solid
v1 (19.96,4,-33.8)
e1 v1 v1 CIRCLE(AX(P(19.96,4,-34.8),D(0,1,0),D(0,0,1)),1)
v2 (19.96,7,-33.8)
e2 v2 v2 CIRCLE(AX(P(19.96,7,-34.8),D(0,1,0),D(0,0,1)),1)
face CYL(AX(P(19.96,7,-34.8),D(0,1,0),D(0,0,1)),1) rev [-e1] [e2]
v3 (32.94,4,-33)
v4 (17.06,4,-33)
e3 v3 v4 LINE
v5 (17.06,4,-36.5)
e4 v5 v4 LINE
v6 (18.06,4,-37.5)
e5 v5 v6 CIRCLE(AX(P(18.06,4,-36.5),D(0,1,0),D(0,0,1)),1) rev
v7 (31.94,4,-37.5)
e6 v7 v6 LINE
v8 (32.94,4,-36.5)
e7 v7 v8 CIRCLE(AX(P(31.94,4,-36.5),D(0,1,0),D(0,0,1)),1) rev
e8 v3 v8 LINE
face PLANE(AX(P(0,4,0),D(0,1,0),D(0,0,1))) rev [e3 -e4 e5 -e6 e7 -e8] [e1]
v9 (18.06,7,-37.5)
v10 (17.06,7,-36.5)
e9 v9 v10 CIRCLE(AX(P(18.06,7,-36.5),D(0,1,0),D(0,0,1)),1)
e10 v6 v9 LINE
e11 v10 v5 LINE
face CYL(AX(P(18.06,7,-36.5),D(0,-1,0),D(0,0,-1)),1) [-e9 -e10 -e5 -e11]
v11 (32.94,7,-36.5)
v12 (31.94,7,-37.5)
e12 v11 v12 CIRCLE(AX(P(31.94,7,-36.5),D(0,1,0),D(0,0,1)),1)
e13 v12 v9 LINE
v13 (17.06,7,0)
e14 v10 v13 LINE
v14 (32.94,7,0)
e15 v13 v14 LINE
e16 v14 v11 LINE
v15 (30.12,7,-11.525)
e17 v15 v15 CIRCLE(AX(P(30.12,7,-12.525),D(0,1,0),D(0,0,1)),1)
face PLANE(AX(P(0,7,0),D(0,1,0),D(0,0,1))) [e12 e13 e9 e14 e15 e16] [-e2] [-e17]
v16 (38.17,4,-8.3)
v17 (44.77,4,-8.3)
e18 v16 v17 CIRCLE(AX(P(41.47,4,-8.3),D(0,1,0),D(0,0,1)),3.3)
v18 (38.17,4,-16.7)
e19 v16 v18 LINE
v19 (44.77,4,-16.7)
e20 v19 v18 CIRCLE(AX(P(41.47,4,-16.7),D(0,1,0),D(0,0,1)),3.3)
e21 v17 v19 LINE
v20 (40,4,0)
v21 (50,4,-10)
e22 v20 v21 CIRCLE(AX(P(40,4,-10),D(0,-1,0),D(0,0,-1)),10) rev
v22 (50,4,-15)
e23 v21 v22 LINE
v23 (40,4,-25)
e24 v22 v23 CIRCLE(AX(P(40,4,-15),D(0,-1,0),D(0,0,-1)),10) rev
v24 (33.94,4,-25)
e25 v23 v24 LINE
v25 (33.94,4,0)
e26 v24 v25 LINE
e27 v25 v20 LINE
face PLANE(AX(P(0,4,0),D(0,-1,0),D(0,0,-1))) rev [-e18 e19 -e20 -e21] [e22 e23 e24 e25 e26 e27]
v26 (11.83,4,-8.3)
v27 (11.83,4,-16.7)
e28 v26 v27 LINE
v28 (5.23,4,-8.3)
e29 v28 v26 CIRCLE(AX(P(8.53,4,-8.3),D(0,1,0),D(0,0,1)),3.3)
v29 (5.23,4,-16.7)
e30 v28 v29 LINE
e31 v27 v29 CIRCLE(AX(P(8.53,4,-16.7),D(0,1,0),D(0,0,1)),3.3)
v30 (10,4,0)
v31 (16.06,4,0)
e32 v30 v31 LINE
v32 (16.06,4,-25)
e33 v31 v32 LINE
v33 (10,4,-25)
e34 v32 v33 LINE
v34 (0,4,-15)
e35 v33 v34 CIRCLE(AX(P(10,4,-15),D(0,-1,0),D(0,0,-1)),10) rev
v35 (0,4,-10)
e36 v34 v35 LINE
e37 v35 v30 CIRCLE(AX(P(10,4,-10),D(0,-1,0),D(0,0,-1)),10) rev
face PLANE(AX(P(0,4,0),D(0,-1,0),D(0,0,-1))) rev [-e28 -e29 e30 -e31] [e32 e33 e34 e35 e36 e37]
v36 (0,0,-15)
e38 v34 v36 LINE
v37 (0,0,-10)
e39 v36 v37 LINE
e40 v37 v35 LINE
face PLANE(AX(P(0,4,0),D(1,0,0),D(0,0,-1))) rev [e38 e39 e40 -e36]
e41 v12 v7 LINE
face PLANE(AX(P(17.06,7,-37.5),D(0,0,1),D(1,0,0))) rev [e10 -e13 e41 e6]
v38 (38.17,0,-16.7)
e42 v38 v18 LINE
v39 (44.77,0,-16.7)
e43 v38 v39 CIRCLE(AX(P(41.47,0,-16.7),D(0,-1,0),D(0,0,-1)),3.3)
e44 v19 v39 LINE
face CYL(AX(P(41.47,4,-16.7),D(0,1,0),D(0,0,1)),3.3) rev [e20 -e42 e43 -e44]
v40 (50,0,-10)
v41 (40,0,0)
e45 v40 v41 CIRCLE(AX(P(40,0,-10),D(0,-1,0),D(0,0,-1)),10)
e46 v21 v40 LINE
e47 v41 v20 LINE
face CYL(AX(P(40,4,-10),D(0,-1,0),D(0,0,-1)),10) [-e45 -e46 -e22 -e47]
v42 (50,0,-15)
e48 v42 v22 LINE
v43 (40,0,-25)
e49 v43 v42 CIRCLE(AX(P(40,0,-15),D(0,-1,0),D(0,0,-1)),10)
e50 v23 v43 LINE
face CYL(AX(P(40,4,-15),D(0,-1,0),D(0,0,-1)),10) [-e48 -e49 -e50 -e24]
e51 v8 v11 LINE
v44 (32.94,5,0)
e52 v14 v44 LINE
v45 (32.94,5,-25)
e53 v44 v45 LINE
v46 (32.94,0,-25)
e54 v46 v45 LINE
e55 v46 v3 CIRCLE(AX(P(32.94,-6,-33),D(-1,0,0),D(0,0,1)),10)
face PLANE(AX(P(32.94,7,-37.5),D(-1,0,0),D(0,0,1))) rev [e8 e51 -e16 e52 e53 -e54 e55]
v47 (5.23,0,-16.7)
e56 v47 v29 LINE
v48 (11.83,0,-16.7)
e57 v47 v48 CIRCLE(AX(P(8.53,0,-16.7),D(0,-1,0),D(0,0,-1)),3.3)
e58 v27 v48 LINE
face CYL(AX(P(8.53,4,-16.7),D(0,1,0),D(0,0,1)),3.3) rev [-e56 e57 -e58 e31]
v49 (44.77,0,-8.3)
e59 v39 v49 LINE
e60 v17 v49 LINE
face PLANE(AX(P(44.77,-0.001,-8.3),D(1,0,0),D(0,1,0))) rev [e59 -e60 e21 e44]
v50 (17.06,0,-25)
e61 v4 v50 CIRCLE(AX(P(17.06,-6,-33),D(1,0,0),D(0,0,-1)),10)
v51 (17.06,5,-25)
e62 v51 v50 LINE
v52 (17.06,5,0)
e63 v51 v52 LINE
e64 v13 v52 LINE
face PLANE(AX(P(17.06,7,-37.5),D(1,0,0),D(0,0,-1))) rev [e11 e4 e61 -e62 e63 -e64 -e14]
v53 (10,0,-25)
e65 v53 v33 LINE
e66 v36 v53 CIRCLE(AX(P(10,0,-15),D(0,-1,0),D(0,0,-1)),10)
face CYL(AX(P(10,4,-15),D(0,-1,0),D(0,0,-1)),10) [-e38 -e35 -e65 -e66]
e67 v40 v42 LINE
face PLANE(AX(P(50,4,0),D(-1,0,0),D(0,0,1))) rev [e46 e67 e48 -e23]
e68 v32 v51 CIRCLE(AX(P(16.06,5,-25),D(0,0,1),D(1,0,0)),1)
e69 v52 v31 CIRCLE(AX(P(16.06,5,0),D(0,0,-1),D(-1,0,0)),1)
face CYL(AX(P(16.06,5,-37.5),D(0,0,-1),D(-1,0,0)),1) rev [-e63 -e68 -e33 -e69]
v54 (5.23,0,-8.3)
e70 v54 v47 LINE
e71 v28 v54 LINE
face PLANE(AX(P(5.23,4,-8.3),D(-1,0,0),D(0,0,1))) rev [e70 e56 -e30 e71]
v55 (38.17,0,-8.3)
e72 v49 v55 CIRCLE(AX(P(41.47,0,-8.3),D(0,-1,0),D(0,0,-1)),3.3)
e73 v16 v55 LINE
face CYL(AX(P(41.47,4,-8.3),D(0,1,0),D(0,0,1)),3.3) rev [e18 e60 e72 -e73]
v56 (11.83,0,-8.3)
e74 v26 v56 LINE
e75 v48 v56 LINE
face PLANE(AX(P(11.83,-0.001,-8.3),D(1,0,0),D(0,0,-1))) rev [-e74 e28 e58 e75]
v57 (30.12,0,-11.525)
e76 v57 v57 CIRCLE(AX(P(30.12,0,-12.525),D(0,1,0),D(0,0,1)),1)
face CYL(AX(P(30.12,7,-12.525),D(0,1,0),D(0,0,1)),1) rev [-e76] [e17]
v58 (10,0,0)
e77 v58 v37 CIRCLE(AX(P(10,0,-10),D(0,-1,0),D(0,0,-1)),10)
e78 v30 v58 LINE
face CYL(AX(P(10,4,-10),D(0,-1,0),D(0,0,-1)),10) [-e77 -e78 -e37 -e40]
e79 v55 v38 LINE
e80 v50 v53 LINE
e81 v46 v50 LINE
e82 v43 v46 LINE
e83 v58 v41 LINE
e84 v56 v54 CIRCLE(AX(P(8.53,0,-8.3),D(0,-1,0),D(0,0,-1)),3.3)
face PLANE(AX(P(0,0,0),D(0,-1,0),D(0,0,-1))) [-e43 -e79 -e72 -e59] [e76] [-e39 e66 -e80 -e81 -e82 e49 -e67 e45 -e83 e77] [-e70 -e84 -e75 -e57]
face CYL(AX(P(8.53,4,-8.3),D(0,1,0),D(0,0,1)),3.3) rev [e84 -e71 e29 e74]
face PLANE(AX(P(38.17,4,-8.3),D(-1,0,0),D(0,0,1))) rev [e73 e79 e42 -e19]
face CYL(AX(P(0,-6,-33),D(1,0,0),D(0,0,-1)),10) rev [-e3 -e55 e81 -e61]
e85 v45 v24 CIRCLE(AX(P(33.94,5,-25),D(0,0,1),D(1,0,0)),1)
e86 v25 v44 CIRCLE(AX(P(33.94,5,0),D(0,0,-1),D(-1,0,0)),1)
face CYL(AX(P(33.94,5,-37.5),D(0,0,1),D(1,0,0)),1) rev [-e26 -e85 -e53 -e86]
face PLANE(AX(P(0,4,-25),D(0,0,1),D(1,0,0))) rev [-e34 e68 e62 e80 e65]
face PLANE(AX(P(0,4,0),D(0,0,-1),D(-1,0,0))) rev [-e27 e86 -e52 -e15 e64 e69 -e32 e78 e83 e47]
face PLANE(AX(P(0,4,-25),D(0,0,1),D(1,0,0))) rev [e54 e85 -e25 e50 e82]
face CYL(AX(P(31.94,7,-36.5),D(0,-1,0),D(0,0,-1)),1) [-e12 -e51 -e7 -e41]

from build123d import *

# Parameters (mm, degrees)
SKETCH1_W                = 50
SKETCH1_H                = 25
BOSS_EXTRUDE1_DEPTH      = 4
SKETCH2_W                = 15.88
SKETCH2_H                = 37.5
BOSS_EXTRUDE2_DEPTH      = 3
M6_CLEARANCE_SLOT1_DEPTH = 4
M3_CLEARANCE_HOLE1_D     = 2
FILLET3_R                = 10
FILLET4_R                = 10
FILLET5_R                = 1


# Read off the part's stored shape, not the designer's step: M6 Clearance Slot1
with BuildPart() as part:
    # Sketch1 → Boss-Extrude1 (new body)
    with BuildSketch(Plane(origin=(0, 0, 0), x_dir=(1, 0, 0), z_dir=(0, 1, 0))):
        with Locations((25, 12.5)):
            Rectangle(SKETCH1_W, SKETCH1_H)
    extrude(amount=BOSS_EXTRUDE1_DEPTH)

    # Sketch2 → Boss-Extrude2 (add)
    with BuildSketch(Plane(origin=(0, 4, 0), x_dir=(1, 0, 0), z_dir=(0, 1, 0))):
        with Locations((25, 18.75)):
            Rectangle(SKETCH2_W, SKETCH2_H)
    extrude(amount=BOSS_EXTRUDE2_DEPTH)

    # M6 Clearance Slot1 outline → M6 Clearance Slot1 (cut)
    with BuildSketch(Plane(origin=(0, 0, 0), x_dir=(1, 0, 0), z_dir=(0, 1, 0))):
        with BuildLine():
            Line((44.77, 8.3), (44.77, 16.7))
            ThreePointArc((44.77, 16.7), (41.47, 20), (38.17, 16.7))
            Line((38.17, 16.7), (38.17, 8.3))
            ThreePointArc((38.17, 8.3), (41.47, 5), (44.77, 8.3))
        make_face()
        with BuildLine():
            Line((11.83, 8.3), (11.83, 16.7))
            ThreePointArc((11.83, 16.7), (8.53, 20), (5.23, 16.7))
            Line((5.23, 16.7), (5.23, 8.3))
            ThreePointArc((5.23, 8.3), (8.53, 5), (11.83, 8.3))
        make_face()
    extrude(amount=M6_CLEARANCE_SLOT1_DEPTH, mode=Mode.SUBTRACT)

    # M3 Clearance Hole1 (through all)
    with Locations(Plane(origin=(0, 7, 0), x_dir=(1, 0, 0), z_dir=(0, 1, 0))):
        with Locations((19.96, 34.8), (30.12, 12.525)):
            Hole(M3_CLEARANCE_HOLE1_D / 2)

    # Fillet3
    fillet3_edges = [part.edges().sort_by_distance(p)[0] for p in [
        (0, 2, -25),
        (50, 2, -25),
        (50, 2, 0),
        (0, 2, 0),
    ]]
    fillet(fillet3_edges, radius=FILLET3_R)

    # Fillet4
    # the kernel refuses this fillet: 10 mm, written as the material it adds along each edge
    with BuildSketch(Plane(origin=(32.94, 4, -25), x_dir=(0, -1, 0), z_dir=(-1, 0, 0))) as fillet4_piece_1:
        with BuildLine():
            CenterArc((10, -8), FILLET4_R, 126.869897646, 53.130102354)
            Line((0, -8), (-0.2, -8))
            Line((-0.2, -8), (-0.2, 0))
            Line((-0.2, 0), (0, 0.2))
            ThreePointArc((0, 0.2), (2, 0.2), (3.88, 0.16))
            Line((3.88, 0.16), (4, 0))
        make_face()
    extrude(amount=15.88)

    # Fillet5
    fillet5_edges = [part.edges().sort_by_distance(p)[0] for p in [
        (32.94, 4, -12.5),
        (17.06, 4, -12.5),
        (32.94, 5.5, -37.5),
        (17.06, 5.5, -37.5),
    ]]
    fillet(fillet5_edges, radius=FILLET5_R)


solid = part.part
